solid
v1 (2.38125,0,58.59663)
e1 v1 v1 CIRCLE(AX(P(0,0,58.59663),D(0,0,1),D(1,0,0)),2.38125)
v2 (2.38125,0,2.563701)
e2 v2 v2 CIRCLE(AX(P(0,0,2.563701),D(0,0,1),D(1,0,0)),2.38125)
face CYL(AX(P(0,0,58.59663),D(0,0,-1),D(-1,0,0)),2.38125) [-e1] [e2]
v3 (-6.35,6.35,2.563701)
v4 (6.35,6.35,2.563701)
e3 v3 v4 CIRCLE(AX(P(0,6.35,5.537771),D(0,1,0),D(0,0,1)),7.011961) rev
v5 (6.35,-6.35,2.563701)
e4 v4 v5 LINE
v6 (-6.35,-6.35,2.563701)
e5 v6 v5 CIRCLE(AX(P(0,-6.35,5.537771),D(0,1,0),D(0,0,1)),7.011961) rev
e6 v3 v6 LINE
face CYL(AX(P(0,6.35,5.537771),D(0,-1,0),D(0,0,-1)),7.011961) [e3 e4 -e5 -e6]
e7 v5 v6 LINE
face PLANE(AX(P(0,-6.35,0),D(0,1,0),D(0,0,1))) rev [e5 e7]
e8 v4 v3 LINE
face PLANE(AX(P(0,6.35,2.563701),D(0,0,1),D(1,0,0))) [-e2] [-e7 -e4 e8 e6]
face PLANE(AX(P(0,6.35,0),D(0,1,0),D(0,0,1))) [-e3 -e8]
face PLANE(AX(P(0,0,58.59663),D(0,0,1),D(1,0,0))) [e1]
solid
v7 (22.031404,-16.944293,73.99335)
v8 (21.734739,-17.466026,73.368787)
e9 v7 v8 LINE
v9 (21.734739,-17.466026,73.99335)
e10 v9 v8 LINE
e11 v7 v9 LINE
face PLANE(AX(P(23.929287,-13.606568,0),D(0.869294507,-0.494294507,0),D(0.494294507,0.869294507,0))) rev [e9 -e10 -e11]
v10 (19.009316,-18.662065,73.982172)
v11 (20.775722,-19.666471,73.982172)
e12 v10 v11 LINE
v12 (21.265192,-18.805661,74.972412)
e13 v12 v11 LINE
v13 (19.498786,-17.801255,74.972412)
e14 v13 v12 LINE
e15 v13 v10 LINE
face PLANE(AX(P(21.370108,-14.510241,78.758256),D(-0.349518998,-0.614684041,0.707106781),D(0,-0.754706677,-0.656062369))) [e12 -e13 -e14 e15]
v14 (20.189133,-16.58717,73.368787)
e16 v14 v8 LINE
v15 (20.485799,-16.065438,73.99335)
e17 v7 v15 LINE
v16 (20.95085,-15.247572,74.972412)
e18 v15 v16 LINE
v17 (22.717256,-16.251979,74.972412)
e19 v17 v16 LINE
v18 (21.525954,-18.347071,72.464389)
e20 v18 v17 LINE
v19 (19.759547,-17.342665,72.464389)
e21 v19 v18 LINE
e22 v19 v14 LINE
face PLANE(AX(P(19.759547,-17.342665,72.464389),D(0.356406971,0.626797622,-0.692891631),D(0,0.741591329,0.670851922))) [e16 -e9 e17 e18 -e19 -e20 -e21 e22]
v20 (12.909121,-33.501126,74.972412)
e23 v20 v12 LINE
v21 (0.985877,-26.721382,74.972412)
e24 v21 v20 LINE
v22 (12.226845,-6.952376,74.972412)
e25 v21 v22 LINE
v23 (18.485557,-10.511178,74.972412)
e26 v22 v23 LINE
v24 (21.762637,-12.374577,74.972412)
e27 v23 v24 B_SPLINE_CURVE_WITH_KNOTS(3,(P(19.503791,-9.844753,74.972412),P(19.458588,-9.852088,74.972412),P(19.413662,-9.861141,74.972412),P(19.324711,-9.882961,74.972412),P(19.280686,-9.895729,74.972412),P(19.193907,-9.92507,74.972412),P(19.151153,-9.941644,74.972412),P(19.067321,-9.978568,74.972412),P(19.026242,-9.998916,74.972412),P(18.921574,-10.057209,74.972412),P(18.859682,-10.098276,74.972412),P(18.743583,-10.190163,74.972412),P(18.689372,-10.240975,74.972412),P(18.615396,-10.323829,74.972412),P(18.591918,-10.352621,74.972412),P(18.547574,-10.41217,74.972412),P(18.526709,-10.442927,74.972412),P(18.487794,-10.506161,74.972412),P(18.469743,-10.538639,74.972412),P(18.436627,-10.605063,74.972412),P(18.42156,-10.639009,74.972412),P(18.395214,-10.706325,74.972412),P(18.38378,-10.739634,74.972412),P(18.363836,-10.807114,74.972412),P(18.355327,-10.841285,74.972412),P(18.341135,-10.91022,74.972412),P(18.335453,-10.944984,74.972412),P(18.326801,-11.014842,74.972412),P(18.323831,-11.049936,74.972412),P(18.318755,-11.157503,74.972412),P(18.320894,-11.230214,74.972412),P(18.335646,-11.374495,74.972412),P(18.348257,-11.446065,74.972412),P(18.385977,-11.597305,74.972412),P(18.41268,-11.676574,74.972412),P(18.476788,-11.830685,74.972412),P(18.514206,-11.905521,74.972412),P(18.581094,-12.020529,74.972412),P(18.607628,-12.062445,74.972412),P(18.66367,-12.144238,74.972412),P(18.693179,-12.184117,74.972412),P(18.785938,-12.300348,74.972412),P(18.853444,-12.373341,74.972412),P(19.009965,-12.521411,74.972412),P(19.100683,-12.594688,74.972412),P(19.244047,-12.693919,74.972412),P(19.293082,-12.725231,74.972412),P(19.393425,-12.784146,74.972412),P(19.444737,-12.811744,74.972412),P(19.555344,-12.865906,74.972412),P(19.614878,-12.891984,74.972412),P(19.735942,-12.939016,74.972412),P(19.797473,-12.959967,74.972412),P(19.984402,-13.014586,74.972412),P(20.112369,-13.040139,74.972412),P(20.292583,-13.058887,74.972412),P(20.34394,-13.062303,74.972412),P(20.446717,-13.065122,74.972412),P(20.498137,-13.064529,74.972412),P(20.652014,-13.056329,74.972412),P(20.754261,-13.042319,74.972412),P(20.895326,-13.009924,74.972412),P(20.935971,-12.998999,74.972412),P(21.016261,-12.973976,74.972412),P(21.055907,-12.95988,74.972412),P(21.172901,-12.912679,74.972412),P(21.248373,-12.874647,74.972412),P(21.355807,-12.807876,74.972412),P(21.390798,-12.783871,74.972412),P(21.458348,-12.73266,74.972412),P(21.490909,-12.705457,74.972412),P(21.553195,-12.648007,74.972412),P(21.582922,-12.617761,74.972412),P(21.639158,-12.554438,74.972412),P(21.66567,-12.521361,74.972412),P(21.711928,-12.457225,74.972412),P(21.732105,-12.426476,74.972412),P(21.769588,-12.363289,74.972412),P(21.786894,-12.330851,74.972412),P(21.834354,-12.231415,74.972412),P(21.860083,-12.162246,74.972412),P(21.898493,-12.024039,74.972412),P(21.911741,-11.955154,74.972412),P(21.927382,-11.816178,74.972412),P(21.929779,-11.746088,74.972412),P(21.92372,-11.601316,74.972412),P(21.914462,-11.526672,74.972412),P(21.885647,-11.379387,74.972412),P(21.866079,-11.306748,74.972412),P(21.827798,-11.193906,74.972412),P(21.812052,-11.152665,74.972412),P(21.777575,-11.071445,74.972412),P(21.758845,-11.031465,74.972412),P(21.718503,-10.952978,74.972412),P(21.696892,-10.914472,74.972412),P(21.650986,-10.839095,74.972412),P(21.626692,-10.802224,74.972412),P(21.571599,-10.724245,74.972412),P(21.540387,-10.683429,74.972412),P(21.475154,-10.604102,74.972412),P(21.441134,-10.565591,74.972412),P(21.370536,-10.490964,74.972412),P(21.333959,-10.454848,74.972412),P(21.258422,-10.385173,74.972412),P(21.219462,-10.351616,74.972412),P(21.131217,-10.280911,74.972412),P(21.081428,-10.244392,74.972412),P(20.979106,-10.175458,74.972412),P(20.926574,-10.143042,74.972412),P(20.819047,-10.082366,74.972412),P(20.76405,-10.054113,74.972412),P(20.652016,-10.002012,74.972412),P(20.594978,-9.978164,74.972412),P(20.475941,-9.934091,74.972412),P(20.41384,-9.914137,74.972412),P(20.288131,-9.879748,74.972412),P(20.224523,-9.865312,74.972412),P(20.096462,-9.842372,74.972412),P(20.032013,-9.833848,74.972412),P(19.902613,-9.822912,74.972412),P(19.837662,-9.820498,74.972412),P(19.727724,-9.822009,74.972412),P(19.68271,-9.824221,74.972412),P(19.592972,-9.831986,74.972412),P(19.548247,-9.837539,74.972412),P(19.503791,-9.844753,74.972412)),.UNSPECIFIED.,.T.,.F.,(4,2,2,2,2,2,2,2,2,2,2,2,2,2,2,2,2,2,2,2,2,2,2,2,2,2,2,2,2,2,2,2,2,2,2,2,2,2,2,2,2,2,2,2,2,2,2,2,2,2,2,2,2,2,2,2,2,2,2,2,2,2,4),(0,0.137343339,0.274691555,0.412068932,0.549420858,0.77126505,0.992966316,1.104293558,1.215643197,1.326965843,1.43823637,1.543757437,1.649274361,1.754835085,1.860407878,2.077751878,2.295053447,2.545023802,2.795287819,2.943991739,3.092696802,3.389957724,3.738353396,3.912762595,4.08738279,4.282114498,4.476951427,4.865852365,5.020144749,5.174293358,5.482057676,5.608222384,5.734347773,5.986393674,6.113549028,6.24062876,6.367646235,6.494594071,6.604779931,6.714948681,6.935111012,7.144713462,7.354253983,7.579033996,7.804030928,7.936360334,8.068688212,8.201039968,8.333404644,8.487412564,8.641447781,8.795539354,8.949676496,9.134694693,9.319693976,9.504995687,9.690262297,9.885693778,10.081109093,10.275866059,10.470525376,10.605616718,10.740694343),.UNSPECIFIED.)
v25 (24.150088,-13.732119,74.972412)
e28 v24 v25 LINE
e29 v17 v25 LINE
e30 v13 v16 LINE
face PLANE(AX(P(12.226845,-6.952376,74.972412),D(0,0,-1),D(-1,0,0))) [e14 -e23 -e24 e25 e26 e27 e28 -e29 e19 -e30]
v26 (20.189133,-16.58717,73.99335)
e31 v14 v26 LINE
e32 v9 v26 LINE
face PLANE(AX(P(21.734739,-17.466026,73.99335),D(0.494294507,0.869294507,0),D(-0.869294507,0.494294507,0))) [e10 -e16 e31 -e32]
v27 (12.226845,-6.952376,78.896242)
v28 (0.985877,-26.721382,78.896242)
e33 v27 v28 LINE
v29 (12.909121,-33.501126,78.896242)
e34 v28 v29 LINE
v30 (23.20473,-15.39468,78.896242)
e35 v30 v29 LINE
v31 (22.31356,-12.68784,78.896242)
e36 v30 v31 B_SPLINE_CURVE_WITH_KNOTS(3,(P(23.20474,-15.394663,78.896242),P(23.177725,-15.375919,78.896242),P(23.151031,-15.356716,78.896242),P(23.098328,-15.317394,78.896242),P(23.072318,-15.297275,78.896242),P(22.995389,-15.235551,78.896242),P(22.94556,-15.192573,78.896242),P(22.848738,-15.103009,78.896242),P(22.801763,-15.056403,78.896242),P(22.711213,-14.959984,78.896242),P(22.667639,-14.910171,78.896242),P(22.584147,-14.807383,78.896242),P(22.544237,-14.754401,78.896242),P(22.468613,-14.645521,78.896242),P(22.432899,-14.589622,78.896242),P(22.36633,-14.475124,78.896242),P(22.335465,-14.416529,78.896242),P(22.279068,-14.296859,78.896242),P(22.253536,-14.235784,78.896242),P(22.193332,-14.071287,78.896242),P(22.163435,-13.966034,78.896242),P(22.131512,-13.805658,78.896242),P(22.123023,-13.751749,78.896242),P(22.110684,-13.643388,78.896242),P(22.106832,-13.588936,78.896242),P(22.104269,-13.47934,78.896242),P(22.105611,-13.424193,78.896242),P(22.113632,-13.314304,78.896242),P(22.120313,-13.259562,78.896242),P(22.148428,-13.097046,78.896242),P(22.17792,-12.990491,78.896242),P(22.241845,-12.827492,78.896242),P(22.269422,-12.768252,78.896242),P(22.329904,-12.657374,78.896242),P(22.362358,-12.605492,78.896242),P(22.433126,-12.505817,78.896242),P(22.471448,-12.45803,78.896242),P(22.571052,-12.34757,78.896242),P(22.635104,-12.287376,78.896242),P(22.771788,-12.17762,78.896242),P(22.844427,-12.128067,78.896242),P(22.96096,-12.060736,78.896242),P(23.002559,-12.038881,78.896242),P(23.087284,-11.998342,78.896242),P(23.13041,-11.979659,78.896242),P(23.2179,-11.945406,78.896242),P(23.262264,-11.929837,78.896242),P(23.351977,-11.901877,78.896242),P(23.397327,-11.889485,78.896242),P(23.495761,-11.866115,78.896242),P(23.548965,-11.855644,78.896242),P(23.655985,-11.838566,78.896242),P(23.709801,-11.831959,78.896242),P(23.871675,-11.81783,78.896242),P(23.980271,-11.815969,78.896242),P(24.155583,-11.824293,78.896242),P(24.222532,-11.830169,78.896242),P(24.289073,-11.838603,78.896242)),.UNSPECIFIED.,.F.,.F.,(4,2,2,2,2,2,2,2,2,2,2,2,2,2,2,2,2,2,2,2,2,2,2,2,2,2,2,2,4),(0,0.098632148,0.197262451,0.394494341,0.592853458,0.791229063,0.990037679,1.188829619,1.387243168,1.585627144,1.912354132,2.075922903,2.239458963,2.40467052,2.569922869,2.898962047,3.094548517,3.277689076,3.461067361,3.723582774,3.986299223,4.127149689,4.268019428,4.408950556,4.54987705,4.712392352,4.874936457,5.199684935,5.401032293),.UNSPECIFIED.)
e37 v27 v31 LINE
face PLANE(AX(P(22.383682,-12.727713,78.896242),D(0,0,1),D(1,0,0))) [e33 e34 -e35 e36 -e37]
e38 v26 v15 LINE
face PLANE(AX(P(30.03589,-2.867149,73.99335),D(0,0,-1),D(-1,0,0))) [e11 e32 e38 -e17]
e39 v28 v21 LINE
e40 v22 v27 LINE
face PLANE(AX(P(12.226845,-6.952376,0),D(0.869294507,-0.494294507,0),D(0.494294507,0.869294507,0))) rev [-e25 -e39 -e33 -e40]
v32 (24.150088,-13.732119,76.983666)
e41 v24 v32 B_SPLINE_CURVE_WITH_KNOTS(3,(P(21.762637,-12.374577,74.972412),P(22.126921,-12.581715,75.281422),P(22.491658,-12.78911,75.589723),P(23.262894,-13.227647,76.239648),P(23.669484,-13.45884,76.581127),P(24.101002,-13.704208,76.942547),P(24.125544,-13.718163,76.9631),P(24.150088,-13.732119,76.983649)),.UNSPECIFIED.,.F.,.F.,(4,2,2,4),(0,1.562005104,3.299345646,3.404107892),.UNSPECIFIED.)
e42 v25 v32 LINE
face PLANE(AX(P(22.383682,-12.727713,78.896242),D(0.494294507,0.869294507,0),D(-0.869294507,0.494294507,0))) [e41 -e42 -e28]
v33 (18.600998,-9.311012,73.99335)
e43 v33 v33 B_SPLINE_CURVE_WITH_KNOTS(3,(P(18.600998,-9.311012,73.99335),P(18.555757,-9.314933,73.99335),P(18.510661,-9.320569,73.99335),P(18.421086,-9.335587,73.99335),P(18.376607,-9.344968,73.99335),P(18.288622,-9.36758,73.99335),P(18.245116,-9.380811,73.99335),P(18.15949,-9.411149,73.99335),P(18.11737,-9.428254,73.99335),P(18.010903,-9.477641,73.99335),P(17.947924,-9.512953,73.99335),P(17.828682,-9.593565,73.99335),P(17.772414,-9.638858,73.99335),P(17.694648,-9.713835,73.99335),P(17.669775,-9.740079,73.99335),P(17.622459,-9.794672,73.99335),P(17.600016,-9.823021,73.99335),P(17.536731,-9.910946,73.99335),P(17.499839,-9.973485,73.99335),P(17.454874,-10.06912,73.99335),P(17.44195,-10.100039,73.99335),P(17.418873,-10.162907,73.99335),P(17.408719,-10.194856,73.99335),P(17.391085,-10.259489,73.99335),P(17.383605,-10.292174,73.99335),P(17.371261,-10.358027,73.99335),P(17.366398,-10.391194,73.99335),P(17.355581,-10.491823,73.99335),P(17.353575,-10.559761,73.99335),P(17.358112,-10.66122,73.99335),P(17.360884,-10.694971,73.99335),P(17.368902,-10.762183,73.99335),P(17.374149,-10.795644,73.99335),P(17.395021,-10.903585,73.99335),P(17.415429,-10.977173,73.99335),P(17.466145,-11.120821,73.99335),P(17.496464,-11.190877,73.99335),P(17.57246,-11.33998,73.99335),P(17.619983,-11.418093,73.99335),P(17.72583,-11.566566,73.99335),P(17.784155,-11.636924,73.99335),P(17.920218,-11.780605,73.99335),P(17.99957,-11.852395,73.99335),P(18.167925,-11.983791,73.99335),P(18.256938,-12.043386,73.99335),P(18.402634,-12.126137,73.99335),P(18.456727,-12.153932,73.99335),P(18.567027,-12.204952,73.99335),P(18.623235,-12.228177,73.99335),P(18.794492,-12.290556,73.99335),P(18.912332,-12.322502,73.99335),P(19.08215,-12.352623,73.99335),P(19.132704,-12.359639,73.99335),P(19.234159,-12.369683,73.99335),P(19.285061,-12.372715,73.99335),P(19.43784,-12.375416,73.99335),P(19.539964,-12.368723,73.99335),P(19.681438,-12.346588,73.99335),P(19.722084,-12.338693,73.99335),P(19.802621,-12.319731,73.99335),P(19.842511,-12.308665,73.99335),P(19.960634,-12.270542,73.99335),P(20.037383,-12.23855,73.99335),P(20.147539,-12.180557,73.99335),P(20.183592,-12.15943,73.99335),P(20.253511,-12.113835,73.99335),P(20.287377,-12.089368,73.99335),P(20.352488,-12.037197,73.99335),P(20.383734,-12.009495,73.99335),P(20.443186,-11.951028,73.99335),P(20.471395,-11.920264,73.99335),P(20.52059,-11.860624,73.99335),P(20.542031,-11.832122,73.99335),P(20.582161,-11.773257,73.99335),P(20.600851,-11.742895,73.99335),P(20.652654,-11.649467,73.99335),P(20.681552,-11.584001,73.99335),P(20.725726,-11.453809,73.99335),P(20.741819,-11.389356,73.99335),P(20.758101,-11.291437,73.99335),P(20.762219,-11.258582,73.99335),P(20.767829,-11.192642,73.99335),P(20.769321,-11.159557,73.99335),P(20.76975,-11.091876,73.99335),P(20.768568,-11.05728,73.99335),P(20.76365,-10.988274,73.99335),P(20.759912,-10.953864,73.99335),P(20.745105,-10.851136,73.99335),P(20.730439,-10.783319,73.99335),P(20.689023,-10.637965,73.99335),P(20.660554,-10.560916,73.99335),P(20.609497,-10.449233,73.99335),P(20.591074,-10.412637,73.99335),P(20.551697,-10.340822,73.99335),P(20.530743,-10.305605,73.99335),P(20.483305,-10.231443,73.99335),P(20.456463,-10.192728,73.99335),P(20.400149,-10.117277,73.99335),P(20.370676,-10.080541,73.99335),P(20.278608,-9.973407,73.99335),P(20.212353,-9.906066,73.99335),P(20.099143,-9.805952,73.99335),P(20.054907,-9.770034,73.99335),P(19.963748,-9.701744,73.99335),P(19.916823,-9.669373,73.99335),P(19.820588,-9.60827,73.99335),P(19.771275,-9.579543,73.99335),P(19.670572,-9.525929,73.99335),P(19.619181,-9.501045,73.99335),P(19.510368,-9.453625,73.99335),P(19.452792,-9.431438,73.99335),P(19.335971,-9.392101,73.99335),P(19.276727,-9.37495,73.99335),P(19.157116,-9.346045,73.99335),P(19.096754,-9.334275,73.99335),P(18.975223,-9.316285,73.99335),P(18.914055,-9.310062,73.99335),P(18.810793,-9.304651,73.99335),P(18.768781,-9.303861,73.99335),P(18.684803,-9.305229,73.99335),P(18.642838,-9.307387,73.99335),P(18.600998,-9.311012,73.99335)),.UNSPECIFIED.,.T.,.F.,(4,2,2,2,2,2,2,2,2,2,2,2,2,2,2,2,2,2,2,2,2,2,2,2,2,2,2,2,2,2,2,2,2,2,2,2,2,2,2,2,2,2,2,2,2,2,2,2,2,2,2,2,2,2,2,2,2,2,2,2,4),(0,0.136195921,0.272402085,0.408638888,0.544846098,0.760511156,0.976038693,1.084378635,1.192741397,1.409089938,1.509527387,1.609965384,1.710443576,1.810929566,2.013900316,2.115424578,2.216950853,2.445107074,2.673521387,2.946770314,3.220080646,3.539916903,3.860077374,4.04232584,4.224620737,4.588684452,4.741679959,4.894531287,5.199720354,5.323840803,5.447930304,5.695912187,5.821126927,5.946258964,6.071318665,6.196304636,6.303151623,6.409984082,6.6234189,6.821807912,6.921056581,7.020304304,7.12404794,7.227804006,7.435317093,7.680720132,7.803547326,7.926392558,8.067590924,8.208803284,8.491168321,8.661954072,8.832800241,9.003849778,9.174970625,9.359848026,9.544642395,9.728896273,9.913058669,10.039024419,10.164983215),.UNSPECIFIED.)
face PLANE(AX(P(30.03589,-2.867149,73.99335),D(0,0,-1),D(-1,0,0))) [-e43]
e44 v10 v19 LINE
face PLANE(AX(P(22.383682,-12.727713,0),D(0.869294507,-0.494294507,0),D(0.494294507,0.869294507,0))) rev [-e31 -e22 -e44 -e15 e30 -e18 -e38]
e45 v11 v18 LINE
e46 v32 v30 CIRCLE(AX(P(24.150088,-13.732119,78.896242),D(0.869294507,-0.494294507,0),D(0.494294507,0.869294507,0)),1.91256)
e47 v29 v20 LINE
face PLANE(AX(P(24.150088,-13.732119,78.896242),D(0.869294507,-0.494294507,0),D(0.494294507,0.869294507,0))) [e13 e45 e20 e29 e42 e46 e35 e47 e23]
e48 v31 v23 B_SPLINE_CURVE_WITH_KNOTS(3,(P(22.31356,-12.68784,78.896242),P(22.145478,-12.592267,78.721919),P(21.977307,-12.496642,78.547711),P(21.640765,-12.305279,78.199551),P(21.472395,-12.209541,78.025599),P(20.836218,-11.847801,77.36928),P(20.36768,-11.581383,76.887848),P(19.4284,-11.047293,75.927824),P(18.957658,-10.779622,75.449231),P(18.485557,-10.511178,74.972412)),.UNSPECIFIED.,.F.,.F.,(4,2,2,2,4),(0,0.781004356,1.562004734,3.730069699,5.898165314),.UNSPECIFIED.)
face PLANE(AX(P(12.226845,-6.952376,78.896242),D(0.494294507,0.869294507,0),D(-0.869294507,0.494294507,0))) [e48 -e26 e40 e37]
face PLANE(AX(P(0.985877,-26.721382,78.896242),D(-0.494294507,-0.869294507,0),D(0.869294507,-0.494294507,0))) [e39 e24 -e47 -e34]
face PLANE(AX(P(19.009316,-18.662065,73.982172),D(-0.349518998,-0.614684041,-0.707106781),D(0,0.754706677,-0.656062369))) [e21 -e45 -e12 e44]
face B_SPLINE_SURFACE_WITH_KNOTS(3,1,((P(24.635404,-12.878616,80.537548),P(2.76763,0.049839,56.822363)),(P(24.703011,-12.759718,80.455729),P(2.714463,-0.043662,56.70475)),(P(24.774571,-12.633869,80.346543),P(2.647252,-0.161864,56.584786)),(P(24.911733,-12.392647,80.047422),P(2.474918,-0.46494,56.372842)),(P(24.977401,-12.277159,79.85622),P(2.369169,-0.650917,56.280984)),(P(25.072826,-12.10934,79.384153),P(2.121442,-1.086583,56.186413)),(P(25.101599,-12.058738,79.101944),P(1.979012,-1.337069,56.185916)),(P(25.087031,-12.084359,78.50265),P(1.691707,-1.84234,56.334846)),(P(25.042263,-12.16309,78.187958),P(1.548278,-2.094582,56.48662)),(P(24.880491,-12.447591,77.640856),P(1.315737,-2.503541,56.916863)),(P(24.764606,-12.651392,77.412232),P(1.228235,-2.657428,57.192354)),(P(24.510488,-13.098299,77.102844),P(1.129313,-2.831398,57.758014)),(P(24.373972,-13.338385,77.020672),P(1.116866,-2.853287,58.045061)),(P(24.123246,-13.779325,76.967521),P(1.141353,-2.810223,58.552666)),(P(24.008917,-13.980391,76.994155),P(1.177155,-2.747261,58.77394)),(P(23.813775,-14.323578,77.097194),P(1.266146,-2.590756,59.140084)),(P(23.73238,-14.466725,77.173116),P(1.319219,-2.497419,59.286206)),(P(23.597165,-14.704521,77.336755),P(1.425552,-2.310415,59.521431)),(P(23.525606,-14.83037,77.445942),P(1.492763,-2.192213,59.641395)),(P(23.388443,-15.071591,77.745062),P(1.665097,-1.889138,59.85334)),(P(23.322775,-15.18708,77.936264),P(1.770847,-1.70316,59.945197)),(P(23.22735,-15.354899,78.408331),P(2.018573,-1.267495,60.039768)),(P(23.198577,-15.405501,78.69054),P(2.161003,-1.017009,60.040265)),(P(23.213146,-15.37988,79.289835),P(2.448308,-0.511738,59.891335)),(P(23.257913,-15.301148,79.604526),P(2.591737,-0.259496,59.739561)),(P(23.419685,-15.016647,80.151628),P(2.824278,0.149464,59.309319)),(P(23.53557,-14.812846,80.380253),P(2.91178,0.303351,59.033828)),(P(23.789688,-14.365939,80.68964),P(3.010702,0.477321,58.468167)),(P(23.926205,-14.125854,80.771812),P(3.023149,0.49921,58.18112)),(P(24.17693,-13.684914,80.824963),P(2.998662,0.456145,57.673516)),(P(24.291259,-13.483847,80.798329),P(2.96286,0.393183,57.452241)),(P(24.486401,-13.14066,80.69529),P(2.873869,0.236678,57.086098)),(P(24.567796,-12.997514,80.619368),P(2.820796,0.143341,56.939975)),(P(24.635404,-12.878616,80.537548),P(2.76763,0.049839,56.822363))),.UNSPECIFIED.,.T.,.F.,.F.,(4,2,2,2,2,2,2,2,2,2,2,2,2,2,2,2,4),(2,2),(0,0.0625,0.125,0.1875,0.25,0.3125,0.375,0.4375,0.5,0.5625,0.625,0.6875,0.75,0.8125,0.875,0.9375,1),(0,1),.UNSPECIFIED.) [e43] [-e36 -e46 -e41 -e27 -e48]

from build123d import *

# Parameters (mm, degrees)
SKETCH1_R           = 2.38125
BOSS_EXTRUDE1_DEPTH = 58.596630013
BOSS_EXTRUDE2_DEPTH = 6.35
BOSS_EXTRUDE4_DEPTH = 2.032
SKETCH9_W           = 3.923830529
SKETCH9_H           = 22.741437235
BOSS_EXTRUDE5_DEPTH = 13.716
SKETCH10_W          = 30.955715765
SKETCH10_H          = 16.793936396
CUT_EXTRUDE1_DEPTH  = 25.146


with BuildPart() as part:
    # Sketch1 → Boss-Extrude1 (new body)
    with BuildSketch(Plane.XY):
        Circle(SKETCH1_R)
    extrude(amount=BOSS_EXTRUDE1_DEPTH)

    # Sketch2 → Boss-Extrude2 (add, symmetric)
    with BuildSketch(Plane(origin=(0, 0, 0), x_dir=(1, 0, 0), z_dir=(0, 1, 0))):
        with BuildLine():
            Line((-6.35, -2.563701192), (0, -2.563701192))
            Line((0, -2.563701192), (6.35, -2.563701192))
            ThreePointArc((6.35, -2.563701192), (0, 1.474189404), (-6.35, -2.563701192))
        make_face()
    extrude(amount=BOSS_EXTRUDE2_DEPTH, both=True)


with BuildPart() as body_2:
    # Loft1: read off the stored shape, not the designer's step
    # Loft1: loft between two sections, ruled curve by curve
    loft1_from = [
        Edge.make_bspline([(24.635403527, -12.878615764, 80.537548375), (24.703010916, -12.759717555, 80.455728817), (24.77457053, -12.633868737, 80.346542629), (24.911732936, -12.392647108, 80.047422189), (24.977401408, -12.277158789, 79.856219839), (25.072825843, -12.109339936, 79.38415277), (25.101598912, -12.058737976, 79.101944057), (25.087030549, -12.08435873, 78.502649545), (25.042262607, -12.163090185, 78.187958466), (24.880490774, -12.447591356, 77.640856383), (24.76460641, -12.651392206, 77.412231552), (24.510487992, -13.098299348, 77.102844403), (24.373971523, -13.338384995, 77.020671771), (24.123246128, -13.779324972, 76.96752084), (24.008916688, -13.980391244, 76.994154883), (23.813775258, -14.323578092, 77.097193937), (23.732379916, -14.466724581, 77.173116318), (23.597165139, -14.704520999, 77.336755435), (23.525605524, -14.830369818, 77.445941623), (23.388443119, -15.071591446, 77.745062063), (23.322774646, -15.187079766, 77.936264413), (23.227350212, -15.354898618, 78.408331482), (23.198577142, -15.405500579, 78.690540195), (23.213145506, -15.379879824, 79.289834707), (23.257913447, -15.30114837, 79.604525786), (23.41968528, -15.016647199, 80.151627869), (23.535569644, -14.812846348, 80.3802527), (23.789688063, -14.365939206, 80.689639849), (23.926204532, -14.125853559, 80.771812481), (24.176929926, -13.684913583, 80.824963412), (24.291259366, -13.483847311, 80.798329369), (24.486400797, -13.140660463, 80.695290315), (24.567796138, -12.997513973, 80.619367934), (24.635403527, -12.878615764, 80.537548375)], [0, 0, 0, 0, 0.0625, 0.0625, 0.125, 0.125, 0.1875, 0.1875, 0.25, 0.25, 0.3125, 0.3125, 0.375, 0.375, 0.4375, 0.4375, 0.5, 0.5, 0.5625, 0.5625, 0.625, 0.625, 0.6875, 0.6875, 0.75, 0.75, 0.8125, 0.8125, 0.875, 0.875, 0.9375, 0.9375, 1, 1, 1, 1], 3),
    ]
    loft1_to = [
        Edge.make_bspline([(2.767629763, 0.049839418, 56.82236264), (2.714463118, -0.043662476, 56.704750196), (2.64725177, -0.161864184, 56.584786377), (2.474918122, -0.464939965, 56.372841519), (2.369168557, -0.65091718, 56.28098433), (2.12144239, -1.086582543, 56.186412949), (1.979011826, -1.337069056, 56.185916163), (1.691706982, -1.842339737, 56.334845804), (1.548278172, -2.094581822, 56.486619954), (1.315737433, -2.503541227, 56.916862609), (1.228234782, -2.657428378, 57.192353655), (1.129312793, -2.83139823, 57.758013891), (1.116866397, -2.853287171, 58.045061216), (1.141353454, -2.810222836, 58.552665546), (1.177154765, -2.747260609, 58.773939726), (1.266145812, -2.590755879, 59.140083551), (1.319218682, -2.497418903, 59.286206124), (1.425551973, -2.310415115, 59.521431011), (1.49276332, -2.192213406, 59.64139483), (1.665096968, -1.889137626, 59.853339688), (1.770846533, -1.70316041, 59.945196877), (2.0185727, -1.267495047, 60.039768258), (2.161003265, -1.017008534, 60.040265044), (2.448308108, -0.511737853, 59.891335404), (2.591736918, -0.259495768, 59.739561253), (2.824277658, 0.149463636, 59.309318598), (2.911780308, 0.303350787, 59.033827552), (3.010702298, 0.477320639, 58.468167316), (3.023148693, 0.49920958, 58.181119991), (2.998661636, 0.456145246, 57.673515661), (2.962860325, 0.393183019, 57.452241481), (2.873869279, 0.236678289, 57.086097656), (2.820796408, 0.143341312, 56.939975083), (2.767629763, 0.049839418, 56.82236264)], [0, 0, 0, 0, 0.0625, 0.0625, 0.125, 0.125, 0.1875, 0.1875, 0.25, 0.25, 0.3125, 0.3125, 0.375, 0.375, 0.4375, 0.4375, 0.5, 0.5, 0.5625, 0.5625, 0.625, 0.625, 0.6875, 0.6875, 0.75, 0.75, 0.8125, 0.8125, 0.875, 0.875, 0.9375, 0.9375, 1, 1, 1, 1], 3),
    ]
    loft1 = Solid(Shell([*[Face.make_surface_from_curves(loft1_from[k], loft1_to[k]) for k in range(1)], Face(Wire(loft1_from)), Face(Wire(loft1_to))]))
    add(loft1)

    # Sketch8 → Boss-Extrude4 (add)
    with BuildSketch(Plane(origin=(24.150088027, -13.732119277, 0), x_dir=(0, 0, -1), z_dir=(0.869294507164732, -0.49429450716473244, 0))):
        Polygon((-78.75825642, -2.050545662), (-73.982171856, -6.826630226), (-72.464389408, -5.308847777), (-76.921993148, -1.025272831), (-76.921993148, 0), (-78.896242126, 0), (-78.896242126, -2.050545662), align=None)
    extrude(amount=-BOSS_EXTRUDE4_DEPTH)

    # Sketch9 → Boss-Extrude5 (add)
    with BuildSketch(Plane(origin=(24.150088027, -13.732119277, 0), x_dir=(0, 0, -1), z_dir=(0.869294507164732, -0.49429450716473244, 0))):
        with Locations((-76.934326862, -11.370718618)):
            Rectangle(SKETCH9_W, SKETCH9_H)
    extrude(amount=-BOSS_EXTRUDE5_DEPTH)

    # Sketch10 → Cut-Extrude1 (cut)
    with BuildSketch(Plane(origin=(2.070007545, -1.177038795, 0), x_dir=(0, 0, -1), z_dir=(0.8692945071647321, -0.49429450716473244, 0))):
        with Locations((-58.515492189, 3.957209781)):
            Rectangle(SKETCH10_W, SKETCH10_H)
    extrude(amount=CUT_EXTRUDE1_DEPTH, mode=Mode.SUBTRACT)


solid = Compound([part.part, body_2.part])
